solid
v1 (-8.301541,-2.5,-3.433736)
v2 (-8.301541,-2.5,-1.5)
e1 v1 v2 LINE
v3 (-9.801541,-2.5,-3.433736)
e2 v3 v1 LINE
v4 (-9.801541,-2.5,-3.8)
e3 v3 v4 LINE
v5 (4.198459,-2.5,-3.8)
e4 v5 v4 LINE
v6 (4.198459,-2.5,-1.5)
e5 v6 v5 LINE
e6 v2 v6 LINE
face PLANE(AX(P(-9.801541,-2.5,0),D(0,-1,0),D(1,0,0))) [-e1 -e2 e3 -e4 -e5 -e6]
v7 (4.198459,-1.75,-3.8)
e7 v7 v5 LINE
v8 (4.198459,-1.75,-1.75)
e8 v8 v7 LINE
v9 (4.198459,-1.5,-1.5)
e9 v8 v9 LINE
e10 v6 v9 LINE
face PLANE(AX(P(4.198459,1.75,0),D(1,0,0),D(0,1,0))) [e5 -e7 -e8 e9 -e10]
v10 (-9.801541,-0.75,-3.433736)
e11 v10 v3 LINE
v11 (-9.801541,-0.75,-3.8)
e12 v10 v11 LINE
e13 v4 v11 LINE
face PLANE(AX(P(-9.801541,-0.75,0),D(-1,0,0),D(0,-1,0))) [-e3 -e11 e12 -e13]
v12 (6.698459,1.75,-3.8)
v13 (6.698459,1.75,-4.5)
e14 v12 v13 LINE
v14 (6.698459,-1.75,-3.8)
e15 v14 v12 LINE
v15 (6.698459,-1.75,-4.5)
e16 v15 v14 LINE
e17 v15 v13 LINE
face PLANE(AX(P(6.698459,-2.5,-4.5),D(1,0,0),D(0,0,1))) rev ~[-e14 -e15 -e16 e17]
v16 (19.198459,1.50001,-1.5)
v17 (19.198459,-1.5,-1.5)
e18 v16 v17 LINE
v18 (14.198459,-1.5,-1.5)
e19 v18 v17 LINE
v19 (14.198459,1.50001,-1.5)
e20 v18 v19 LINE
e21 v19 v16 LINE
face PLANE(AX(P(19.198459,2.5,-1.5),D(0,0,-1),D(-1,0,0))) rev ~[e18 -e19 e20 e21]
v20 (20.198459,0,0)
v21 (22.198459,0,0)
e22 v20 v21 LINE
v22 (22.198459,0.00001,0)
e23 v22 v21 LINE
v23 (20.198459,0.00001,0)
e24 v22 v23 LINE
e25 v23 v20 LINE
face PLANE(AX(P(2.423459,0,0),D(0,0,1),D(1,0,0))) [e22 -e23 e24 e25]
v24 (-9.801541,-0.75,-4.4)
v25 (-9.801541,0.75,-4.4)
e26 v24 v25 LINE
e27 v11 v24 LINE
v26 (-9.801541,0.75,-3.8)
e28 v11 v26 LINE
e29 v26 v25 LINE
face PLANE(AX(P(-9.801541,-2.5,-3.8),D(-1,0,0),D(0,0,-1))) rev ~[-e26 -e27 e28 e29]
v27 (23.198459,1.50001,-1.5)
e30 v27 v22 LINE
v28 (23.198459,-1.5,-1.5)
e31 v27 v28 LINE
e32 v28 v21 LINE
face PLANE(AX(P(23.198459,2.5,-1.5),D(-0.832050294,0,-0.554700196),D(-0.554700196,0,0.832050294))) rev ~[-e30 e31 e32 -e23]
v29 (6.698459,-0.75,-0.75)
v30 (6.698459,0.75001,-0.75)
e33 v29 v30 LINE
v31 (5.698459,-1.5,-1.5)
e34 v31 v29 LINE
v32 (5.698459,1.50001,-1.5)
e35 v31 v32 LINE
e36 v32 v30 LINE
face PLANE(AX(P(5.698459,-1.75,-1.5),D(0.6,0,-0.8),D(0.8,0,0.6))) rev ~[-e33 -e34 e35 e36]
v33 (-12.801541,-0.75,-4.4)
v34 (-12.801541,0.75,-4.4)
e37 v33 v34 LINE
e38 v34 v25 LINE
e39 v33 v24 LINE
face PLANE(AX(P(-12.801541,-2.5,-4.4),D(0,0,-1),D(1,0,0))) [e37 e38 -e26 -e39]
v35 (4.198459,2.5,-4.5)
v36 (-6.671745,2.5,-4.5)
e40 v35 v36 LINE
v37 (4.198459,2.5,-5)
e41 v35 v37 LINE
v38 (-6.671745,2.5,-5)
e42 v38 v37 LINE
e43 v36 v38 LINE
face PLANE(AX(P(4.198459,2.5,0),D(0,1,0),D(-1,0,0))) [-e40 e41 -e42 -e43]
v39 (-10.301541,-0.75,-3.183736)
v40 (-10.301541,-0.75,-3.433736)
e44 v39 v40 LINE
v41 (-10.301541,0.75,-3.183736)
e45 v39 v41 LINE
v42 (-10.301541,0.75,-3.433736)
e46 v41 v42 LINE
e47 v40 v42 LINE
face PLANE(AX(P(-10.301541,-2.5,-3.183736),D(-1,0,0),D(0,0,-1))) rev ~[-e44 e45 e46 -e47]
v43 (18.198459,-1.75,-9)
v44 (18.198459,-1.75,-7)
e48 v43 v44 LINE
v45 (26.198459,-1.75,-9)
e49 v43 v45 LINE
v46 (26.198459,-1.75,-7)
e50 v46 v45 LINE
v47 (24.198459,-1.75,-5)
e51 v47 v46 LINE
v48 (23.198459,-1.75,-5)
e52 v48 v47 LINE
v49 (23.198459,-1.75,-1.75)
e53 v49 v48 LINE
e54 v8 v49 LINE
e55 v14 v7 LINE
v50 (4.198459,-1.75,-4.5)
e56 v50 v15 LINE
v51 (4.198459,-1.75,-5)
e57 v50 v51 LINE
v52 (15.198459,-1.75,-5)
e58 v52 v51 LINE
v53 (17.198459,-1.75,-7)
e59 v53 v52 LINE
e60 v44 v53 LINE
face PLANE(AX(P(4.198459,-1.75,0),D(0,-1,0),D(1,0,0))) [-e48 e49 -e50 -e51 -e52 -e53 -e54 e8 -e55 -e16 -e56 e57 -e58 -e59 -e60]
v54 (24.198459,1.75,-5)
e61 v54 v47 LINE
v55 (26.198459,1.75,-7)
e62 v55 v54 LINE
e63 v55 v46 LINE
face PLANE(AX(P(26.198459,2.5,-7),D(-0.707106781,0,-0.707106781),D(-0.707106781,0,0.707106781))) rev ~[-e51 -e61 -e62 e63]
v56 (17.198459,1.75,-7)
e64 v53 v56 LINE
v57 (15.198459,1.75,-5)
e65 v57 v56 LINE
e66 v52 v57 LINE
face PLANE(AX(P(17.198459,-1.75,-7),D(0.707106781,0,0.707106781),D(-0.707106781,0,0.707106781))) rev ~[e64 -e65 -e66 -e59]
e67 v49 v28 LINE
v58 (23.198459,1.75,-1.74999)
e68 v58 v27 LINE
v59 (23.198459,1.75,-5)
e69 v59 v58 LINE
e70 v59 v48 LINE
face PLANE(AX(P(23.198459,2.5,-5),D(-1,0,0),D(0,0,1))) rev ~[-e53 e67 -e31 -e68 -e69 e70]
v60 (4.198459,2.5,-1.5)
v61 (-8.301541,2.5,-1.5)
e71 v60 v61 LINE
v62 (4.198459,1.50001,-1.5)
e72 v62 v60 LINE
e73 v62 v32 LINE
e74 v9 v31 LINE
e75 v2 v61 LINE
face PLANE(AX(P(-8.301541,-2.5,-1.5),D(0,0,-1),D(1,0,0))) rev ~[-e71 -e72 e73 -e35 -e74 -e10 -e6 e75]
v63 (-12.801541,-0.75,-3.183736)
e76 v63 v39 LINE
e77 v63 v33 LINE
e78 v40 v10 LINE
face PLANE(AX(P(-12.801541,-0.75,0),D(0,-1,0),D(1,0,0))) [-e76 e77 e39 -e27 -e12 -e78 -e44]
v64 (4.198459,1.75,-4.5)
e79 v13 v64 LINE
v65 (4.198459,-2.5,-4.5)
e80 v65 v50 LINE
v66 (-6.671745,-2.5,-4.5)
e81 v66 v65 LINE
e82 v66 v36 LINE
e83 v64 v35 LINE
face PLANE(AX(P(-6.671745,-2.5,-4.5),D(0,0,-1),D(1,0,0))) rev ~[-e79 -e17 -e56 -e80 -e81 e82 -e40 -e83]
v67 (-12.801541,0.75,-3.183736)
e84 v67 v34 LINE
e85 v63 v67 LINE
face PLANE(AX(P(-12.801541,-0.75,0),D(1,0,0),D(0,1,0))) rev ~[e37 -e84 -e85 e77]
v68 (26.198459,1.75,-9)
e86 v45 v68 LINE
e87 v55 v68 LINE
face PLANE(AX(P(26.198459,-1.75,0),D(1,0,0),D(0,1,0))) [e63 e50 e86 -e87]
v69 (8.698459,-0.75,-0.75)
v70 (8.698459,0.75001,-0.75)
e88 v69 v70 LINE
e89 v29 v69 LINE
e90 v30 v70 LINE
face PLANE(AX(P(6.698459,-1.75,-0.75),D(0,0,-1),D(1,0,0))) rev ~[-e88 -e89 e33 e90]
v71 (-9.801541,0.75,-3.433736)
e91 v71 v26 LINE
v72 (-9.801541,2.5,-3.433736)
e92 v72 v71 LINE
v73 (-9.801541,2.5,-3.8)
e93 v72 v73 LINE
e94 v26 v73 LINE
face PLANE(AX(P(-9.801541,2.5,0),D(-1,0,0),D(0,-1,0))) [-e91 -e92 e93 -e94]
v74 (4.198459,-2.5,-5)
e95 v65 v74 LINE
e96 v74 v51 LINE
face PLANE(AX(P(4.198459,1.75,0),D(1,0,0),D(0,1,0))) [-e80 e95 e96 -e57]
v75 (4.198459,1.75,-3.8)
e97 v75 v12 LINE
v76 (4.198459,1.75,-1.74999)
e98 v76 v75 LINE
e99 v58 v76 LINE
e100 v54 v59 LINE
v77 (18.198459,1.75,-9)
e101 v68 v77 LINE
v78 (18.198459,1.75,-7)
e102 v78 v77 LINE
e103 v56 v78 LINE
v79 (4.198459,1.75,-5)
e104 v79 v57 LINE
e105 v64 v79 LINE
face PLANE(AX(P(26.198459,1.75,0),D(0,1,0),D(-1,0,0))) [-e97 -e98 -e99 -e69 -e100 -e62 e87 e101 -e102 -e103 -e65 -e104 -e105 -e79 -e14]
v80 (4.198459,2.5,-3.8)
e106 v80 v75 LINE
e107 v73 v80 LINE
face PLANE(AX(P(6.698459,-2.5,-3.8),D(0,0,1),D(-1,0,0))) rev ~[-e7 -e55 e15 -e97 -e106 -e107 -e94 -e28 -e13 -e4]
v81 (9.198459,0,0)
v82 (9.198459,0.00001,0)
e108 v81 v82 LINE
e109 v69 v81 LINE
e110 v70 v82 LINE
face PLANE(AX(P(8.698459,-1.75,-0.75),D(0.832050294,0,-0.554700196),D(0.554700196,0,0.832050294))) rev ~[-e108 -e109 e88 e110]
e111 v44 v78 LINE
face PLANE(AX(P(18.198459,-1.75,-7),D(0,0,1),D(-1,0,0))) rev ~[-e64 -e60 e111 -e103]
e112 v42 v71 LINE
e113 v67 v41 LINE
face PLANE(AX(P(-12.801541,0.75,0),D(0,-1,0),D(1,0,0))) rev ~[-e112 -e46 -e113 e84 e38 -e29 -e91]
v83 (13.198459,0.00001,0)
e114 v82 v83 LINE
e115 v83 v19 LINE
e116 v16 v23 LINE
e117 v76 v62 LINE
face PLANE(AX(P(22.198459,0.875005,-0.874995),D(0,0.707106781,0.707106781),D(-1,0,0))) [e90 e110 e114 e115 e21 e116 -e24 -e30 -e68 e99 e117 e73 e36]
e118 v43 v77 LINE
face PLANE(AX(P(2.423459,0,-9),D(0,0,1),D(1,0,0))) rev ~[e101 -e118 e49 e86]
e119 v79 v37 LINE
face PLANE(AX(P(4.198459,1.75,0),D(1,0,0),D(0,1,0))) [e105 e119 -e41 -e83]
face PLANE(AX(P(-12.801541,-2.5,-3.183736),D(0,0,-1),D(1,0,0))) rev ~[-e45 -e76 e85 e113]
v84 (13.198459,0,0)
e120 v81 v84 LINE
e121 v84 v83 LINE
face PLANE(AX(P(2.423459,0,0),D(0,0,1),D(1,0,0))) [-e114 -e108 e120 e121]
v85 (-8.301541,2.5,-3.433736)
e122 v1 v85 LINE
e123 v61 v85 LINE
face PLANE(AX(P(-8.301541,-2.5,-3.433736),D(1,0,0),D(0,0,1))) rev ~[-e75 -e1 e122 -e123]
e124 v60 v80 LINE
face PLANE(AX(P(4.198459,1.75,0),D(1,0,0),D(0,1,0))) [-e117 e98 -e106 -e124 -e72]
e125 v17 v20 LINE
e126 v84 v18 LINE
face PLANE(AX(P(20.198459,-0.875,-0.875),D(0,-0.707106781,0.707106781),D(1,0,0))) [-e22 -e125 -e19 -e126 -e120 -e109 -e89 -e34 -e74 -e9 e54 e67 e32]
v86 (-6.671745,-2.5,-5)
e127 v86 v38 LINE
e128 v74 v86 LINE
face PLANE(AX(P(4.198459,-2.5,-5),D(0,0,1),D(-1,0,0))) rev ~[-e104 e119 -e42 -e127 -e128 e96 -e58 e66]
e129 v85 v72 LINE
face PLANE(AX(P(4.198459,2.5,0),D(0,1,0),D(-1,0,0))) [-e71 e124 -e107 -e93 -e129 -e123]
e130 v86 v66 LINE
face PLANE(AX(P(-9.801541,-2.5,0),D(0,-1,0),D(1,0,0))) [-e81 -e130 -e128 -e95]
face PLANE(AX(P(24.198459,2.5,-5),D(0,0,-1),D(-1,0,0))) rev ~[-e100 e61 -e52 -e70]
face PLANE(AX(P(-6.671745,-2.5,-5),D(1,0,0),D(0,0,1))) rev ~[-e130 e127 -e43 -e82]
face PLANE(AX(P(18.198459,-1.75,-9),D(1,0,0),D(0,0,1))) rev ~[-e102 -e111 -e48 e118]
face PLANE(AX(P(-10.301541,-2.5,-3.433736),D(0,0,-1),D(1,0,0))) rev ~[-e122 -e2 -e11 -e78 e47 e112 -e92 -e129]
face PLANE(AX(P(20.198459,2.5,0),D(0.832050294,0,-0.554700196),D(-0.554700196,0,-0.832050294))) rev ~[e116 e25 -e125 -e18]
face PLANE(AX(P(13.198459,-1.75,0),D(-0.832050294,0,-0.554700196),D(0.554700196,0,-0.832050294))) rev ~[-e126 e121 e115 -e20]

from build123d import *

# Parameters (mm, degrees)
F0_W      = 3
F0_H      = 1.5
F0_W_2    = 2
F0_H_2    = 3.5
F0_W_3    = 1
F0_W_4    = 8
F1_DEPTH  = 9
F5_DEPTH  = 25
F7_DEPTH  = 25
F9_DEPTH  = 25
F10_W     = 3
F10_H     = 0.6
F11_DEPTH = 25
F12_SIZE2 = 1.75
F12_SIZE  = 1.75
F13_SIZE2 = 1.74999
F13_SIZE  = 1.74999


# Not quite as in the source:
# - a fillet or chamfer is up to 0.001 mm smaller than in the source, because OpenCascade refuses the exact size


with BuildPart() as f1:
    # F0 (on Top) → F1 (new body)
    with BuildSketch(Plane.XY):
        Polygon((4.1984589845, 2.5), (-9.8015410155, 2.5), (-9.8015410155, 0.75), (-9.8015410155, -0.75), (-9.8015410155, -2.5), (4.1984589845, -2.5), (4.1984589845, -1.75), (15.1984589845, -1.75), (15.1984589845, 1.75), (4.1984589845, 1.75), align=None)
        with Locations((-11.3015410155, 0)):
            Rectangle(F0_W, F0_H)
        with Locations((16.1984589845, 0)):
            Rectangle(F0_W_2, F0_H_2)
        with Locations((17.6984589845, 0)):
            Rectangle(F0_W_3, F0_H_2)
        with Locations((22.1984589845, 0)):
            Rectangle(F0_W_4, F0_H_2)
    extrude(amount=-F1_DEPTH)

    # F4 (on offset) → F5 (cut)
    with BuildSketch(Plane(origin=(0, 2.5, 0), x_dir=(-1, 0, 0), z_dir=(0, 1, 0))):
        Polygon((-26.1984589845, -7), (-24.1984589845, -5), (-23.1984589845, -5), (-23.1984589845, -1.5), (-22.1984589845, 0), (-26.1984589845, 0), align=None)
        Polygon((-18.1984589845, 0), (-20.1984589845, 0), (-19.1984589845, -1.5), (-18.1984589845, -1.5), align=None)
    extrude(amount=-F5_DEPTH, mode=Mode.SUBTRACT)

    # F6 (on face) → F7 (cut)
    with BuildSketch(Plane.XZ.offset(1.75)):
        Polygon((4.1984589845, -9), (18.1984589845, -9), (18.1984589845, -7), (17.1984589845, -7), (15.1984589845, -5), (4.1984589845, -5), align=None)
        Polygon((8.6984589845, -0.75), (9.1984589845, 0), (4.1984589845, 0), (4.1984589845, -1.5), (5.6984589845, -1.5), (6.6984589845, -0.75), align=None)
        Polygon((15.1984589845, -1.5), (18.1984589845, -1.5), (18.1984589845, 0), (13.1984589845, 0), (14.1984589845, -1.5), align=None)
    extrude(amount=-F7_DEPTH, mode=Mode.SUBTRACT)

    # F8 (on face) → F9 (cut)
    with BuildSketch(Plane.XZ.offset(2.5)):
        Polygon((-12.8015410155, -9), (4.1984589845, -9), (4.1984589845, -5), (-10.3015410155, -5), (-12.8015410155, -5), align=None)
        Polygon((4.1984589845, -1.5), (4.1984589845, 0), (-12.8015410155, 0), (-12.8015410155, -3.1837357674), (-10.3015410155, -3.1837357674), (-10.3015410155, -3.4337357674), (-8.3015410155, -3.4337357674), (-8.3015410155, -1.5), align=None)
    extrude(amount=-F9_DEPTH, mode=Mode.SUBTRACT)

    # F10 (on face) → F11 (cut)
    with BuildSketch(Plane.XZ.offset(2.5)):
        Polygon((-9.8015410155, -5), (-6.6717453301, -5), (-6.6717453301, -4.5), (6.6984589845, -4.5), (6.6984589845, -3.8), (-9.8015410155, -3.8), (-9.8015410155, -4.4), align=None)
        with Locations((-11.3015410155, -4.7)):
            Rectangle(F10_W, F10_H)
    extrude(amount=-F11_DEPTH, mode=Mode.SUBTRACT)

    # F12
    f12_edges = [f1.edges().sort_by_distance(p)[0] for p in [
        (21.198459, -1.75, 0),
    ]]
    chamfer(f12_edges, length=F12_SIZE, length2=F12_SIZE2)

    # F13 (size 1.75 and 1.75 in the source; OpenCascade refuses exactly that, so slightly less here)
    f13_edges = [f1.edges().sort_by_distance(p)[0] for p in [
        (21.198459, 1.75, 0),
    ]]
    chamfer(f13_edges, length=F13_SIZE, length2=F13_SIZE2)


solid = f1.part
